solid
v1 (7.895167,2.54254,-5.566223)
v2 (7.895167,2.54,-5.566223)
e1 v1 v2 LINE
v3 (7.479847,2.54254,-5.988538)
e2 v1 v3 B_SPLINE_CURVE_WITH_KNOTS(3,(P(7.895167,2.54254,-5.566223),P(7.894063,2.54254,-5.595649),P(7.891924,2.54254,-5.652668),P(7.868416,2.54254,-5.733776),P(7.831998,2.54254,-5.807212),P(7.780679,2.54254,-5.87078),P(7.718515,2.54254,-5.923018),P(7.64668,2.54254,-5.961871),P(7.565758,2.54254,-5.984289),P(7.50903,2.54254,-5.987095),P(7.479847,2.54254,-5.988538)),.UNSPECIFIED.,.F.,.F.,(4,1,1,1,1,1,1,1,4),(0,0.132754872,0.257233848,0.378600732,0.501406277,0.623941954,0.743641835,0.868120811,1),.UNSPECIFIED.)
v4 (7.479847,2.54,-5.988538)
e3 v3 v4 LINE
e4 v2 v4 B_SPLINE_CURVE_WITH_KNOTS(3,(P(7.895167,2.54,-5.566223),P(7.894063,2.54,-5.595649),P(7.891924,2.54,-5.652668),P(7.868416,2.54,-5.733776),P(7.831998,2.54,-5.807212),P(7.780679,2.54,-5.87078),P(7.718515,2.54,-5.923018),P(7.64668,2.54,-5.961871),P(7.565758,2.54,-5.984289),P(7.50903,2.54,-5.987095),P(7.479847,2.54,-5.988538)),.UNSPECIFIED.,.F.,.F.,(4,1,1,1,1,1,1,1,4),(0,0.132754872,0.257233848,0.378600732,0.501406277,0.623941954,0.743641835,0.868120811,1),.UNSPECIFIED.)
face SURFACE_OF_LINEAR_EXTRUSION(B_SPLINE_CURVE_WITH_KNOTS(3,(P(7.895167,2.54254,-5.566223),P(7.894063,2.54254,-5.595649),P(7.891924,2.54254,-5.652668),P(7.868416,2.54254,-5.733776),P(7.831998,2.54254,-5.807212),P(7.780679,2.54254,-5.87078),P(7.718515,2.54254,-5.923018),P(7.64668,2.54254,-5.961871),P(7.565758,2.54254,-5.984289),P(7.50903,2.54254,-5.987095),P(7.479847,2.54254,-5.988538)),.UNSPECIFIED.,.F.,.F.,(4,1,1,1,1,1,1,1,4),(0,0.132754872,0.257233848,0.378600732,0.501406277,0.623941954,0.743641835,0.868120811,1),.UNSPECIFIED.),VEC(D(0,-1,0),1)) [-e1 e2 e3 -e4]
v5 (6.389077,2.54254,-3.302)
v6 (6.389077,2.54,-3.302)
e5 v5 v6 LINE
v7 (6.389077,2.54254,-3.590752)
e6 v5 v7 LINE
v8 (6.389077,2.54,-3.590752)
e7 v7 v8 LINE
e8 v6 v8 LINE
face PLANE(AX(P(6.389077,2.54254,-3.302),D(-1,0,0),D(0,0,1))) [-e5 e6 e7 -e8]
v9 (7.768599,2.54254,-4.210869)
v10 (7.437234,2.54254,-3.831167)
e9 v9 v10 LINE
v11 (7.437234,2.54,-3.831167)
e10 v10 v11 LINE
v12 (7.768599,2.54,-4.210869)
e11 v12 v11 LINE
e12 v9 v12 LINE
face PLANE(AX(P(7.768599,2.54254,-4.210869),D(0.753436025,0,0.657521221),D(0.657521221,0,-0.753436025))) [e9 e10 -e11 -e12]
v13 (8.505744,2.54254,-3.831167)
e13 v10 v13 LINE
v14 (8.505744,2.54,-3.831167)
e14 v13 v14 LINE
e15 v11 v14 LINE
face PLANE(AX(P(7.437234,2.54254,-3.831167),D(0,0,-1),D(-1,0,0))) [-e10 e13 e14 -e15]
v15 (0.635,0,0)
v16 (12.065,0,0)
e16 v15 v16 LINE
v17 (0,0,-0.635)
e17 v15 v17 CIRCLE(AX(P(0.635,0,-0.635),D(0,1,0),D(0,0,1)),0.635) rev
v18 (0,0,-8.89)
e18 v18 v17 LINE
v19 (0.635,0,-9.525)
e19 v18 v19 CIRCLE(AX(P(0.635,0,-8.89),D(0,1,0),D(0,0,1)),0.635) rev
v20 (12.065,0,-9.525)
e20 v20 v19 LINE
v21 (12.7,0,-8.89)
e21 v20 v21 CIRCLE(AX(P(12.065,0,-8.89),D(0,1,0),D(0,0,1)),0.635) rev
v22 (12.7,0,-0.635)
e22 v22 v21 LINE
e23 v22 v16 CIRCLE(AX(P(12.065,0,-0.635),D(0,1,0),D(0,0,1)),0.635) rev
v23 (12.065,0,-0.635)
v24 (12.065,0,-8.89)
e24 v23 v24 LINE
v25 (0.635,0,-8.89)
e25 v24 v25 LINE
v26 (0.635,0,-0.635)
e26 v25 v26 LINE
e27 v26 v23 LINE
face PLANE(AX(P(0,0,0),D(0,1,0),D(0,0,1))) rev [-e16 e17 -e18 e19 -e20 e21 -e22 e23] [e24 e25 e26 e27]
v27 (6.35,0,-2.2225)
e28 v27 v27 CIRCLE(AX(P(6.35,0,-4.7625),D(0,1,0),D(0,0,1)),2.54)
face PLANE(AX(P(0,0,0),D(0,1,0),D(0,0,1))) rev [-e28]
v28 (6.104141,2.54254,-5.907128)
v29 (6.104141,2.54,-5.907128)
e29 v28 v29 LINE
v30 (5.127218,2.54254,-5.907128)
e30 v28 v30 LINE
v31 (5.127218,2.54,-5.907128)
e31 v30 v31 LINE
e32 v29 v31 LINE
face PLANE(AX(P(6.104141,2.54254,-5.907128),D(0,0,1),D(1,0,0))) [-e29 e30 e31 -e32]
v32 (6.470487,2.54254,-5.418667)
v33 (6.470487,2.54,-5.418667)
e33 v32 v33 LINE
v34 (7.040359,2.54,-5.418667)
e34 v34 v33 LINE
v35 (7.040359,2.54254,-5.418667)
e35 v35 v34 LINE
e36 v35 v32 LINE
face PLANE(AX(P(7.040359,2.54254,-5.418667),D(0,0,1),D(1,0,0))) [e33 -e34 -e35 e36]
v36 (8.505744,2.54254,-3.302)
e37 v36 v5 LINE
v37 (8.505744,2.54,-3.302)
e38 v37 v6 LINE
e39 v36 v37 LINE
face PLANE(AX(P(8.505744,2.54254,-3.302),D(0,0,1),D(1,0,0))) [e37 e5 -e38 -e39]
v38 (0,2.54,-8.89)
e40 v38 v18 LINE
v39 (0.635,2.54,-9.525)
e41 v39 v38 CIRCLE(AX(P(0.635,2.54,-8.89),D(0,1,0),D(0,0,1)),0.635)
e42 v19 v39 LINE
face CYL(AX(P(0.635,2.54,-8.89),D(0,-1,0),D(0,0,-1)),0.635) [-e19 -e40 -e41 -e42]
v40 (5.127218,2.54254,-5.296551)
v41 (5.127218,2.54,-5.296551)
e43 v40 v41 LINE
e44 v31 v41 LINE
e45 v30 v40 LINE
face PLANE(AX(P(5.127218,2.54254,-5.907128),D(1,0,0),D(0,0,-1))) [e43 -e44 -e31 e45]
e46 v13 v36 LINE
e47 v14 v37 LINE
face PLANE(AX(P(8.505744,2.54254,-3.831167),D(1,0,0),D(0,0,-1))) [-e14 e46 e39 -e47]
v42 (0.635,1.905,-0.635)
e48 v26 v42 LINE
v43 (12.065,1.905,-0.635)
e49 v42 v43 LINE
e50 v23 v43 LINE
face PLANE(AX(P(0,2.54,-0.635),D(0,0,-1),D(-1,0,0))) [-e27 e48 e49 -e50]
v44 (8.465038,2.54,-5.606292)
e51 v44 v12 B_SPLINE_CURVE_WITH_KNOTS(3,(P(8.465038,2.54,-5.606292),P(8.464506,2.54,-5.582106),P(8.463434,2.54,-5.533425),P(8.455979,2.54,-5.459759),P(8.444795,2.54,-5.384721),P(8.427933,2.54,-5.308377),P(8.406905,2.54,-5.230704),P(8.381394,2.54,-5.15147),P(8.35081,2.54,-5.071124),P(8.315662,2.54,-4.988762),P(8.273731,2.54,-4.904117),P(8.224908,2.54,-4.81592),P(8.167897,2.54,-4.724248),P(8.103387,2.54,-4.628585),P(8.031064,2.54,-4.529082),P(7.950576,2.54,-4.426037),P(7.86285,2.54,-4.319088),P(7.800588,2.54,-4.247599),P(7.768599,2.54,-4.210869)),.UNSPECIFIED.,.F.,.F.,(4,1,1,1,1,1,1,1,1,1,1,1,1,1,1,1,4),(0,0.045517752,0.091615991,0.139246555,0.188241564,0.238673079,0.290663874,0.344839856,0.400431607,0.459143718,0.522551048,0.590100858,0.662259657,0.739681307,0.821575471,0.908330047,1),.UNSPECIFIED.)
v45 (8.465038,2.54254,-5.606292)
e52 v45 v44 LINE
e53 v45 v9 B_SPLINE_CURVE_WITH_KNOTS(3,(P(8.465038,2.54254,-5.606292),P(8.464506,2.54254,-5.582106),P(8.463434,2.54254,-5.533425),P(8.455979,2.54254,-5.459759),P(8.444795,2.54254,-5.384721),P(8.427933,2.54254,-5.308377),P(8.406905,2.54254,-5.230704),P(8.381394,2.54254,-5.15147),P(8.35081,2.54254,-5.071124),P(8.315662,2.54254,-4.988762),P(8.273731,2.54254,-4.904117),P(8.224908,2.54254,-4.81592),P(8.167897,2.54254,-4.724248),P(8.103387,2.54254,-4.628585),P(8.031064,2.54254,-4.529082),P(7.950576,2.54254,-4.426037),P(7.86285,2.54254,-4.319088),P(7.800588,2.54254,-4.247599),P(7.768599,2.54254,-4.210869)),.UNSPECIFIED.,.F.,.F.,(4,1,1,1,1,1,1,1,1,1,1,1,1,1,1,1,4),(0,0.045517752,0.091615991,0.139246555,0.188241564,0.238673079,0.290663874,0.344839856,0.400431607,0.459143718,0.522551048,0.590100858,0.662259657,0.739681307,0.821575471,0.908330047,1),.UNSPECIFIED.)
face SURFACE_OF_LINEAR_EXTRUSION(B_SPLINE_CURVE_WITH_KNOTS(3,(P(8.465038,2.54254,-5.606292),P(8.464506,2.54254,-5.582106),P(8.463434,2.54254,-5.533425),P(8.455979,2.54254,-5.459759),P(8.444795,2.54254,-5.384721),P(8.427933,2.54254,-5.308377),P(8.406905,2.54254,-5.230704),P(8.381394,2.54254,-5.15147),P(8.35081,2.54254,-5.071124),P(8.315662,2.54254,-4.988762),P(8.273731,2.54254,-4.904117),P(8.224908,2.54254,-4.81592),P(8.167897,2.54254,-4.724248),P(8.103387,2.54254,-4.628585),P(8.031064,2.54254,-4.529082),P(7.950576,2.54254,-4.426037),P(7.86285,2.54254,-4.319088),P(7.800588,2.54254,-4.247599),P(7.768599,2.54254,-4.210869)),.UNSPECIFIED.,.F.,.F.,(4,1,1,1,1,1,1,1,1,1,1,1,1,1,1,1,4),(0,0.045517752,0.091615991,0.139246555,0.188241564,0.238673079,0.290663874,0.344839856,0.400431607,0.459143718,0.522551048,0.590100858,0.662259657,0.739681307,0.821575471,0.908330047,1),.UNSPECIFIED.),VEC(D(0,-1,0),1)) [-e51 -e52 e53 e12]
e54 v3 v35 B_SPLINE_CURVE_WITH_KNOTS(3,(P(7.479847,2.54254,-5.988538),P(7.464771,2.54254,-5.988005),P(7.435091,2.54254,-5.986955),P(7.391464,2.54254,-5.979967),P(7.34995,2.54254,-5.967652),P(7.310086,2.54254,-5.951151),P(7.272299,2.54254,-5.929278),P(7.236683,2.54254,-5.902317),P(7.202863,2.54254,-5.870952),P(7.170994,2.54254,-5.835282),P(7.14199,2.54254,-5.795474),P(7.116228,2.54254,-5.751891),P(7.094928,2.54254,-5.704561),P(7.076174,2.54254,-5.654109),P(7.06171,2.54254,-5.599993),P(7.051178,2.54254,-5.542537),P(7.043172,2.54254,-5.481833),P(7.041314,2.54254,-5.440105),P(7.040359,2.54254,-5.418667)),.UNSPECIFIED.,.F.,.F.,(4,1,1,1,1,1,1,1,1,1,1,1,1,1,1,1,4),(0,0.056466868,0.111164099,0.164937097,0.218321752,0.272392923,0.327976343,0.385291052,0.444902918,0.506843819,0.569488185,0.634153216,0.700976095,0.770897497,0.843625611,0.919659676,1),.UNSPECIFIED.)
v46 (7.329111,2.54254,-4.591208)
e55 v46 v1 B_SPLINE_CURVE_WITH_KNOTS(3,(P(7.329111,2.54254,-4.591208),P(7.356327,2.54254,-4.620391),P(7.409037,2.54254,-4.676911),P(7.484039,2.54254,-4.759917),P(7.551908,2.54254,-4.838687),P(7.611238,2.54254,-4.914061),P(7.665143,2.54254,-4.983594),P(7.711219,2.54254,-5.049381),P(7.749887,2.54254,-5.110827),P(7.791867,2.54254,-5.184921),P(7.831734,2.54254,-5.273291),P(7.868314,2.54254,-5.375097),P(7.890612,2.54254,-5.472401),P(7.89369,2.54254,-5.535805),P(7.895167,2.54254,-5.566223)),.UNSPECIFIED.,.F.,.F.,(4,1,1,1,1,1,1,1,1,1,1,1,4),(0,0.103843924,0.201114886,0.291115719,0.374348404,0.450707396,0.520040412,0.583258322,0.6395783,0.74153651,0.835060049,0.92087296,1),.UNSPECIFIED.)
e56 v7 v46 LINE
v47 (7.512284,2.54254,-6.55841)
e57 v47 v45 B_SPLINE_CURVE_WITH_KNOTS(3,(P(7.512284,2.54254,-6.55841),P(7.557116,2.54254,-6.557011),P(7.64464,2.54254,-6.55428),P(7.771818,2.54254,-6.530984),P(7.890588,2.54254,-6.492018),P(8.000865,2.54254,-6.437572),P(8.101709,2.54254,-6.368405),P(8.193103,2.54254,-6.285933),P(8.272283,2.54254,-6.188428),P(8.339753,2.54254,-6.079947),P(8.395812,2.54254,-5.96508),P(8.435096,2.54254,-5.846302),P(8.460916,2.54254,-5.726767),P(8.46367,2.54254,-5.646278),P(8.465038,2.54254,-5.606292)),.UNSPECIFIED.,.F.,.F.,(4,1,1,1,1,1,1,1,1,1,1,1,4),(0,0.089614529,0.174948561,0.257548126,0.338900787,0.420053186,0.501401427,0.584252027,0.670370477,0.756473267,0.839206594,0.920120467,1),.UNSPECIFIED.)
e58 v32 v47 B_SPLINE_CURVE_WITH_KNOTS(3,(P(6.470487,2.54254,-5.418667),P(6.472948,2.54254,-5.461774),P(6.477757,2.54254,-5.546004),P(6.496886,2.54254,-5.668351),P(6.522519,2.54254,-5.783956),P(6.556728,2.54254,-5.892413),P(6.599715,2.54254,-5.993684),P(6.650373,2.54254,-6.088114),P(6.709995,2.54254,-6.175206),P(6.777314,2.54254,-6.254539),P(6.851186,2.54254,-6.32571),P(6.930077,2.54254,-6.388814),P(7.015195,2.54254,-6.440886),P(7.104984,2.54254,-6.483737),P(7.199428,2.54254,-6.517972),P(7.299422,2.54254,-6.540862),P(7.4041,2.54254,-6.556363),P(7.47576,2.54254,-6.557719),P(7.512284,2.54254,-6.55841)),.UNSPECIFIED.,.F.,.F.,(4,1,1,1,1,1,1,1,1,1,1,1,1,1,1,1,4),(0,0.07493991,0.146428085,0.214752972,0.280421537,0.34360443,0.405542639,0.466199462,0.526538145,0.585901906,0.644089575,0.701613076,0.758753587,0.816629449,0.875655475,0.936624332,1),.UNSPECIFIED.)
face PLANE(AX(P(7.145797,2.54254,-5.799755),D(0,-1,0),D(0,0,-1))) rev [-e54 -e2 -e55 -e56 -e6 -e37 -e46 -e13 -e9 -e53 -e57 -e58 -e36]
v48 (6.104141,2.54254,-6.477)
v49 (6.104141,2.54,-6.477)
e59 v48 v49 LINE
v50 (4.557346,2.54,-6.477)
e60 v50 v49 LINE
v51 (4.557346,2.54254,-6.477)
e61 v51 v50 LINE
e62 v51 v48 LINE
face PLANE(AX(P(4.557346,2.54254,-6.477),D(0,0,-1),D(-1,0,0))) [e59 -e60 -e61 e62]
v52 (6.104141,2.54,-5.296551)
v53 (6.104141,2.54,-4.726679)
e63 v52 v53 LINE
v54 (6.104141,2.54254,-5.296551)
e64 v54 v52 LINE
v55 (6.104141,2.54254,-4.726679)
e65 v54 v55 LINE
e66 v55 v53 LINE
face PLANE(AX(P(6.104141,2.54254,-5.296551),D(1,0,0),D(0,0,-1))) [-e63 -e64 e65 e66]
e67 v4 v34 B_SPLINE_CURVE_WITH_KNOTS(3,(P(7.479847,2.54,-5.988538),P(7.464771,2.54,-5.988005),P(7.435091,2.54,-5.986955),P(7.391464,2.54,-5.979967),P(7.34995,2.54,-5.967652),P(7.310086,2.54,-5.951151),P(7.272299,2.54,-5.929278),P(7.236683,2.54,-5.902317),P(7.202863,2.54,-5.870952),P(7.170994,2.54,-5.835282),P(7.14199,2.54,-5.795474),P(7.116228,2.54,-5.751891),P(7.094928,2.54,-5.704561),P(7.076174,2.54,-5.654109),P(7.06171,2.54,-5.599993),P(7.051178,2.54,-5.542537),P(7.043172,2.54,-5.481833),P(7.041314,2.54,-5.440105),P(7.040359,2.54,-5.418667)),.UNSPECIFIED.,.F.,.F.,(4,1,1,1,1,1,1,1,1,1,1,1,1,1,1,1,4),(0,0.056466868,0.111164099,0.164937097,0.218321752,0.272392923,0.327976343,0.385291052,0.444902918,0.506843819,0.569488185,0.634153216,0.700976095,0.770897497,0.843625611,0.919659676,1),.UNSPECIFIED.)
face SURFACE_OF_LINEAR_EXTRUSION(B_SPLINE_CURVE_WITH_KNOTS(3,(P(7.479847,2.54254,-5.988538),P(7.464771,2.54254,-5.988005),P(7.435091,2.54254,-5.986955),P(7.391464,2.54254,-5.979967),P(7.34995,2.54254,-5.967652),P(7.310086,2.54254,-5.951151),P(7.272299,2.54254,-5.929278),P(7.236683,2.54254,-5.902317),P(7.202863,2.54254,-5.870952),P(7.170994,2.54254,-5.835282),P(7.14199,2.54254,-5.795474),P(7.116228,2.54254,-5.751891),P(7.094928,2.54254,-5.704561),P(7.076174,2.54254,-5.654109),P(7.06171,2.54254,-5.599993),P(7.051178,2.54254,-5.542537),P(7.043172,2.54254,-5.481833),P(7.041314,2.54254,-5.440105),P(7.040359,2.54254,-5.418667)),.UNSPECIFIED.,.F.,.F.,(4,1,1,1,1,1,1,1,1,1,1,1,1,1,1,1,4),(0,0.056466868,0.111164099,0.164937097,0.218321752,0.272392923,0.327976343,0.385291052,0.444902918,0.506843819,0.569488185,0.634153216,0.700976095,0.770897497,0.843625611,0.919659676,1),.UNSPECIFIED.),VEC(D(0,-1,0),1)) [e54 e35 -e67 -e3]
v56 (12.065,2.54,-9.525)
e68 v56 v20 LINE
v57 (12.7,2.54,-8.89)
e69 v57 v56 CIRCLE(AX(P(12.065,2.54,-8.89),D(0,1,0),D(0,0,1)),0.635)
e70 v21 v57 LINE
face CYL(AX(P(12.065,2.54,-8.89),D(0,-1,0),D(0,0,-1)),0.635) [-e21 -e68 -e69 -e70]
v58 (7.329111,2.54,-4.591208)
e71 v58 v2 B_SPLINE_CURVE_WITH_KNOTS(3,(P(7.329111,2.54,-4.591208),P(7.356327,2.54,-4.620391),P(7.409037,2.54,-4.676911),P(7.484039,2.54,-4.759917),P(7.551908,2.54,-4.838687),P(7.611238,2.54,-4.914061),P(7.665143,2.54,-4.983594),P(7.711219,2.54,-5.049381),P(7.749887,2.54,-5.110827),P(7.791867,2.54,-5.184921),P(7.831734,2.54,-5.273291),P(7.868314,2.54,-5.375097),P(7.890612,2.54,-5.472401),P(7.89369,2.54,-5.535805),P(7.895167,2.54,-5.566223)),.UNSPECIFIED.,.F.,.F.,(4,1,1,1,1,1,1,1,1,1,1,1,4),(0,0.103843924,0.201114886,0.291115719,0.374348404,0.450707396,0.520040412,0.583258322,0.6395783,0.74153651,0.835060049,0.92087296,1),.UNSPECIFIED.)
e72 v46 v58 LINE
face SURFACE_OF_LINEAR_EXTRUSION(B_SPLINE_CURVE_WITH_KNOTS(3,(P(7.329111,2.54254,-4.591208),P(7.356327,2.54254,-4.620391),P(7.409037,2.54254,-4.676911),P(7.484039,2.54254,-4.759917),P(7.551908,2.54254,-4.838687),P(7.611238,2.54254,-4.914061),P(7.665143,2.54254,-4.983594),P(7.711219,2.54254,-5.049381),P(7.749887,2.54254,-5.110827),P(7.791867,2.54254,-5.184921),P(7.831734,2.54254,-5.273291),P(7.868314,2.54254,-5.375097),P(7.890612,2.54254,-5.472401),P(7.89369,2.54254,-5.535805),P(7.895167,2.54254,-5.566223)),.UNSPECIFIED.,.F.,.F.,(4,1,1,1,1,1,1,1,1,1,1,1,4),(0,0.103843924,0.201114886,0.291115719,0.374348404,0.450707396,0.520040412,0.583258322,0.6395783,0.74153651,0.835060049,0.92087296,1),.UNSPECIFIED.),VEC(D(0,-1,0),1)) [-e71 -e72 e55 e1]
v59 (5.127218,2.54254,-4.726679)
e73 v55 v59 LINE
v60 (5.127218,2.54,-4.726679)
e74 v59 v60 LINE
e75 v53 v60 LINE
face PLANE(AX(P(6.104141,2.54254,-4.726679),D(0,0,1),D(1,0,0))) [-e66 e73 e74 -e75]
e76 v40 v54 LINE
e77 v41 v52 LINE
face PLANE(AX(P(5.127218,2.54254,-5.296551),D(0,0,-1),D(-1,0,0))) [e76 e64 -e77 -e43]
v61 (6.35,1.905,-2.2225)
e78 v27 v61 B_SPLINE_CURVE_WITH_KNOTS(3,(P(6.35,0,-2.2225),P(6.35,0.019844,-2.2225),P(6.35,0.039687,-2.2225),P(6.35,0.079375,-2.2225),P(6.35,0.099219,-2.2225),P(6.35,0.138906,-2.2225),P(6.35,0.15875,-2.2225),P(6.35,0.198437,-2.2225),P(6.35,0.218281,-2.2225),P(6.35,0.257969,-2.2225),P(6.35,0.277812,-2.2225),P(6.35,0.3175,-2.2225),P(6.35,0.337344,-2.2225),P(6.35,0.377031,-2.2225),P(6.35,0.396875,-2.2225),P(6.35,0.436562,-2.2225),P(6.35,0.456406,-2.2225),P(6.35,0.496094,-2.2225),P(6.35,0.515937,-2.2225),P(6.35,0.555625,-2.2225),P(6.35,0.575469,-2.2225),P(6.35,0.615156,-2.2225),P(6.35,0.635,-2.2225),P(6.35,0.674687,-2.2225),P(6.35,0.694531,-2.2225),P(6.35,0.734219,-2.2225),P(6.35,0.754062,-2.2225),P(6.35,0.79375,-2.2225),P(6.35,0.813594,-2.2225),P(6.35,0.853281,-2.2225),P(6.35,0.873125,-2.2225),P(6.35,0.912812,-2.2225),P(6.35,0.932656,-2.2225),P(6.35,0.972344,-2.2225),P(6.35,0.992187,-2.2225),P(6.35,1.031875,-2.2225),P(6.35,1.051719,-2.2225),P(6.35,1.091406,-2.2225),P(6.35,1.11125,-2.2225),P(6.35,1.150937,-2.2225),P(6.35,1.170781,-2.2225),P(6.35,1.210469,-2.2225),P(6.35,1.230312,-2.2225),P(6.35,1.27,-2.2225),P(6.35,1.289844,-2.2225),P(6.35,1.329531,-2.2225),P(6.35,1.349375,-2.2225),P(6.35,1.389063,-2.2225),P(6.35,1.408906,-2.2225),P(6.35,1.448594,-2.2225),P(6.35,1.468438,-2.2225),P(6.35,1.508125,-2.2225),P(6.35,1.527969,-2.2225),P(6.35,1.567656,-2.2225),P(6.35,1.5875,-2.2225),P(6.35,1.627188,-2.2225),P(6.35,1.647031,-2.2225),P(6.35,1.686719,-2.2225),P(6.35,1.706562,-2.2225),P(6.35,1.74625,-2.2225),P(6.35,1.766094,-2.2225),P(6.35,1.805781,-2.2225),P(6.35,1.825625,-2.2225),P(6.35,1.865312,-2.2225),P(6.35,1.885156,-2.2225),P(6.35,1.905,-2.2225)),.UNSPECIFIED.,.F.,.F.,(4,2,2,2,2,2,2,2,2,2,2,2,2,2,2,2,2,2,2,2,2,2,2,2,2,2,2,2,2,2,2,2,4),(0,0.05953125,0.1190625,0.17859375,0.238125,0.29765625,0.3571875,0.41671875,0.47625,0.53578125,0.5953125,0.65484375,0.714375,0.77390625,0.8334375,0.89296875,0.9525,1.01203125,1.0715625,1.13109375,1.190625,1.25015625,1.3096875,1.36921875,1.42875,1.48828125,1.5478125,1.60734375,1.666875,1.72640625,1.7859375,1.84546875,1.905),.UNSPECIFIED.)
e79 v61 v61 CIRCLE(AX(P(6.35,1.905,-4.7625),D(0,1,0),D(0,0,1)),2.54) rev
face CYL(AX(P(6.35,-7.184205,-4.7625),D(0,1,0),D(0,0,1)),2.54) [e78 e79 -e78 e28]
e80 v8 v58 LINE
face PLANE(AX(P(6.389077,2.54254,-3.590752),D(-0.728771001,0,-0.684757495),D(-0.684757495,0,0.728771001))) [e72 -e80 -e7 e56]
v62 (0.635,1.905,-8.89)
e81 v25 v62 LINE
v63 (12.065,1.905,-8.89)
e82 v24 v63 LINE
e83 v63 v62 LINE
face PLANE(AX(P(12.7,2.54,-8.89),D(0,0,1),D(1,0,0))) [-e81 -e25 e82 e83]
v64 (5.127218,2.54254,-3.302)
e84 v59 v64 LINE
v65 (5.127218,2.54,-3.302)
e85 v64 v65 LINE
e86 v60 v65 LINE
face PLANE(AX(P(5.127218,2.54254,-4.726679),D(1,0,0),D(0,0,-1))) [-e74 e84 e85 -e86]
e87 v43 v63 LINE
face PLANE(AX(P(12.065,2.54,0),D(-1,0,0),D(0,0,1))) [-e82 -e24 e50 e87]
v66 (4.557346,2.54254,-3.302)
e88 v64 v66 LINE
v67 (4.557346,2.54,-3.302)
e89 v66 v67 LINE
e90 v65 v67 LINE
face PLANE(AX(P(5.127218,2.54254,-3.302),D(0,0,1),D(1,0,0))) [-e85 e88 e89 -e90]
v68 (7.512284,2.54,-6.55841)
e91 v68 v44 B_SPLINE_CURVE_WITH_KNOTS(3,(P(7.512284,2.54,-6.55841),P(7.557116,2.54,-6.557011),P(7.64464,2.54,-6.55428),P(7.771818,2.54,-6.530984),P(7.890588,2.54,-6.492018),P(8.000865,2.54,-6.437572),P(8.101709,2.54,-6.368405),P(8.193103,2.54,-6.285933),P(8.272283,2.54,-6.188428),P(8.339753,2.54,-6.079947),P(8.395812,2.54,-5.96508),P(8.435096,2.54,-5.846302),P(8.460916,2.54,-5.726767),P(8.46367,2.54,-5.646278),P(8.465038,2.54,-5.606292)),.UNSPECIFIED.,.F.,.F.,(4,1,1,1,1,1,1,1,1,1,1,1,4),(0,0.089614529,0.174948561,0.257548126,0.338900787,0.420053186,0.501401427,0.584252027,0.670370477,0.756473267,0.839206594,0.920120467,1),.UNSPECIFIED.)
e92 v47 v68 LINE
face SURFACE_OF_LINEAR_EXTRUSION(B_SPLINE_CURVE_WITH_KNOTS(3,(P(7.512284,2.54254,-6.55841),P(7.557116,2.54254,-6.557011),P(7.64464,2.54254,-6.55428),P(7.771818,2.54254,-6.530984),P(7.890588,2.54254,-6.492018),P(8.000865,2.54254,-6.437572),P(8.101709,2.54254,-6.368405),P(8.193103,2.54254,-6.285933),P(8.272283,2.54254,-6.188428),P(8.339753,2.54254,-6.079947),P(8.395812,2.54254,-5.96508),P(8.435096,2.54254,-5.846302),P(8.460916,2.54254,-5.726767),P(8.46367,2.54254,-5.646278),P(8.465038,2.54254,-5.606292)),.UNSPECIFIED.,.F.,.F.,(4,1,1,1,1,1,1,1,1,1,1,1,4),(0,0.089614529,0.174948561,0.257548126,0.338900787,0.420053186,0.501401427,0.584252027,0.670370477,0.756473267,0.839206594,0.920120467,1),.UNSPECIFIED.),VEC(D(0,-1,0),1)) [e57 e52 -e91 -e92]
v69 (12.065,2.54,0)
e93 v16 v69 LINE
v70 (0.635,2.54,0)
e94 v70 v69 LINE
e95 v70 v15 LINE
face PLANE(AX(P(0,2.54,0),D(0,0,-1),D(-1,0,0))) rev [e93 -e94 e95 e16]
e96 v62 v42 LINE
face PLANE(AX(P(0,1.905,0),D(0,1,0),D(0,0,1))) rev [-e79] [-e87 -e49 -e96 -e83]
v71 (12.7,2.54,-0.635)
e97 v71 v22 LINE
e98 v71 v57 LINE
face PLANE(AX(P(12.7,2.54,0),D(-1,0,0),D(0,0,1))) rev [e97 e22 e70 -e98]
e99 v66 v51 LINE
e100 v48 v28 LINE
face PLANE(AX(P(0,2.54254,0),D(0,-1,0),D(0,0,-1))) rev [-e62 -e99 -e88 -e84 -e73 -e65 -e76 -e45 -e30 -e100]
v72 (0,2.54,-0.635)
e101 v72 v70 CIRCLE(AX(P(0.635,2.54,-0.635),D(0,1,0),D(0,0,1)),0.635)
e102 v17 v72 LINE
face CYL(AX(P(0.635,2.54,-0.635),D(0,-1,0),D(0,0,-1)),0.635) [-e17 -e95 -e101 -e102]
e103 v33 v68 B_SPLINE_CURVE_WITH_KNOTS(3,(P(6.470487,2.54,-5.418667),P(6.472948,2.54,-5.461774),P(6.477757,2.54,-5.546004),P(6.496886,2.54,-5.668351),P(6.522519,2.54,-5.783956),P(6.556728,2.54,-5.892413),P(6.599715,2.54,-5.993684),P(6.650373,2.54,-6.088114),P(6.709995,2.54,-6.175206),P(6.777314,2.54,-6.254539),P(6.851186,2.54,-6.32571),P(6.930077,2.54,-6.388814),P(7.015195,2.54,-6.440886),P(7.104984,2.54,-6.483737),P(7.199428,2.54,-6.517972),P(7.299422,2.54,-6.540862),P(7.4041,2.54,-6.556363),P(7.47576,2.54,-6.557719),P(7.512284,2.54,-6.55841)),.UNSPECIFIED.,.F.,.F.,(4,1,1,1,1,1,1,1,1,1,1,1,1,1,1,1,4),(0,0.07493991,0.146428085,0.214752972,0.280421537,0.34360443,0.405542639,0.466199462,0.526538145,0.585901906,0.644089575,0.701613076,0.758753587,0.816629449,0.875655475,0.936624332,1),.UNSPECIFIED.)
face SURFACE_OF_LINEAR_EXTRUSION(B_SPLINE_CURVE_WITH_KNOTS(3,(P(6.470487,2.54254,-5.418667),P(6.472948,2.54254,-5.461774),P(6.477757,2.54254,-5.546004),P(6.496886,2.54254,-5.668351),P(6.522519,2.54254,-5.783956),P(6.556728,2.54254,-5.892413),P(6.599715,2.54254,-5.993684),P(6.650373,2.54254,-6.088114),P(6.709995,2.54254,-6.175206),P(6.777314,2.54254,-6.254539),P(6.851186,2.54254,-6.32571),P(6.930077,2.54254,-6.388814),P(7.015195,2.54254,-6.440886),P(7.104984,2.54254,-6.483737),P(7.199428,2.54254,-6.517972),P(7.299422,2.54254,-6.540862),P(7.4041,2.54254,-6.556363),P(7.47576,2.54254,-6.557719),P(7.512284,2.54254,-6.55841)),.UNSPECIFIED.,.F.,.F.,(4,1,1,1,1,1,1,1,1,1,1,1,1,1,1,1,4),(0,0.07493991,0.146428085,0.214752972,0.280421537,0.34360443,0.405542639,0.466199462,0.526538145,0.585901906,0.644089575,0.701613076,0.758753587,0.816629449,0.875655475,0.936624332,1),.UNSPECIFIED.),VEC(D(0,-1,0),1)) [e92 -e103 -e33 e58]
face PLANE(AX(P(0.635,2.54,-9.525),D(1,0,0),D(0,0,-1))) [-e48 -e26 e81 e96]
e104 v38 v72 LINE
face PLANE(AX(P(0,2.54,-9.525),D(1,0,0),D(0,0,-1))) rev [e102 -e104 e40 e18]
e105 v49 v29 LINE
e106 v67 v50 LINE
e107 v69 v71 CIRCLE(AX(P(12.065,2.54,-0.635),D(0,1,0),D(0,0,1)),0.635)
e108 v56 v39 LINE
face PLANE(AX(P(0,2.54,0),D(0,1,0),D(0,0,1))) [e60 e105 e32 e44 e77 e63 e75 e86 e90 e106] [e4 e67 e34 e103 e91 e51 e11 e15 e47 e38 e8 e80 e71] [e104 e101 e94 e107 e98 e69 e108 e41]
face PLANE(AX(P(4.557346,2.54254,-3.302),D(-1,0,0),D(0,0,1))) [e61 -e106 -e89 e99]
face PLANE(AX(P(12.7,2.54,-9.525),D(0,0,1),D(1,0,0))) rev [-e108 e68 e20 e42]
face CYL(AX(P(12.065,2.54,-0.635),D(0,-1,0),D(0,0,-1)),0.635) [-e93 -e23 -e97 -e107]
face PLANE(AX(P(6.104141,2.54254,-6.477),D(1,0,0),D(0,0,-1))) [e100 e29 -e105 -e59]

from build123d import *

# Parameters (mm, degrees)
SKETCH1_W           = 12.7
SKETCH1_H           = 9.525
BOSS_EXTRUDE1_DEPTH = 2.54
FILLET1_R           = 0.635
SHELL1_START        = 0.635
SHELL1_OUTLINE_W    = 1.905
SHELL1_OUTLINE_H    = 8.255
SHELL1_DEPTH        = 11.43
SKETCH2_R           = 2.54
BOSS_EXTRUDE2_DEPTH = 1.905
BOSS_EXTRUDE3_DEPTH = 0.00254


# Read off the part's stored shape, not the designer's step: Shell1
with BuildPart() as part:
    # Sketch1 → Boss-Extrude1 (new body)
    with BuildSketch(Plane(origin=(0, 0, 0), x_dir=(1, 0, 0), z_dir=(0, 1, 0))):
        with Locations((6.35, 4.7625)):
            Rectangle(SKETCH1_W, SKETCH1_H)
    extrude(amount=BOSS_EXTRUDE1_DEPTH)

    # Fillet1
    fillet1_edges = [part.edges().sort_by_distance(p)[0] for p in [
        (0, 1.27, -9.525),
        (12.7, 1.27, -9.525),
        (12.7, 1.27, 0),
        (0, 1.27, 0),
    ]]
    fillet(fillet1_edges, radius=FILLET1_R)

    # Shell1 outline → Shell1 (cut)
    with BuildSketch(Plane.YZ.offset(SHELL1_START)):
        with Locations((0.9525, -4.7625)):
            Rectangle(SHELL1_OUTLINE_W, SHELL1_OUTLINE_H)
    extrude(amount=SHELL1_DEPTH, mode=Mode.SUBTRACT)

    # Sketch2 → Boss-Extrude2 (add)
    with BuildSketch(Plane(origin=(0, 1.905, 0), x_dir=(-1, 0, 0), z_dir=(0, -1, 0))):
        with Locations(Location((-6.35, 4.7625, 0), (0, 0, 270))):
            Circle(SKETCH2_R)
    extrude(amount=BOSS_EXTRUDE2_DEPTH)

    # Sketch3 → Boss-Extrude3 (add)
    with BuildSketch(Plane(origin=(0, 2.54, 0), x_dir=(1, 0, 0), z_dir=(0, 1, 0))):
        Polygon((4.557346154, 6.477), (6.104141026, 6.477), (6.104141026, 5.907128205), (5.127217949, 5.907128205), (5.127217949, 5.296551282), (6.104141026, 5.296551282), (6.104141026, 4.726679487), (5.127217949, 4.726679487), (5.127217949, 3.302), (4.557346154, 3.302), align=None)
        with BuildLine():
            Line((7.040358974, 5.418666667), (6.470487179, 5.418666667))
            add(Edge.make_bspline(
                [(6.470487179, 5.418666667), (6.472948368, 5.461774453), (6.477757384, 5.54600448), (6.496886431, 5.66835129), (6.522518698, 5.783955572), (6.556728361, 5.89241293), (6.599715041, 5.993683952), (6.65037258, 6.088113879), (6.709995163, 6.175205533), (6.777313826, 6.254538911), (6.851185682, 6.325709616), (6.930077079, 6.388814034), (7.015194768, 6.440886212), (7.104983579, 6.483736794), (7.199428222, 6.517972417), (7.299422293, 6.540861702), (7.404099988, 6.55636255), (7.475760347, 6.557718936), (7.512284054, 6.558410256)],
                knots=[0, 0, 0, 0, 1.199038563, 2.342849363, 3.436047546, 4.486744587, 5.497670872, 6.488682221, 7.459191391, 8.424610317, 9.374430501, 10.305433194, 11.225809216, 12.140057399, 13.06607119, 14.010487599, 14.985989317, 16, 16, 16, 16], degree=3))
            add(Edge.make_bspline(
                [(7.512284054, 6.558410256), (7.557116388, 6.557011369), (7.644639608, 6.554280414), (7.77181779, 6.53098446), (7.890588306, 6.492018376), (8.000864822, 6.437572481), (8.101708535, 6.368404679), (8.193102721, 6.285933395), (8.272283476, 6.188428338), (8.339752827, 6.079946535), (8.395811794, 5.965079574), (8.435095583, 5.846302372), (8.460916395, 5.726766795), (8.463670345, 5.646277588), (8.465038462, 5.606291867)],
                knots=[0, 0, 0, 0, 1.075374347, 2.099382735, 3.09057751, 4.06680945, 5.040638231, 6.016817125, 7.011024321, 8.044445721, 9.0776792, 10.070479129, 11.0414456, 12, 12, 12, 12], degree=3))
            add(Edge.make_bspline(
                [(8.465038462, 5.606291867), (8.464505789, 5.582105677), (8.463433651, 5.53342485), (8.455978932, 5.459758812), (8.44479538, 5.384721339), (8.427933309, 5.308376769), (8.406904924, 5.230703702), (8.381394454, 5.151469689), (8.350810158, 5.071123958), (8.315662426, 4.98876223), (8.273731092, 4.904117111), (8.224907883, 4.815919737), (8.167896919, 4.724248345), (8.103386822, 4.62858533), (8.03106428, 4.529081566), (7.950576239, 4.426036789), (7.862849733, 4.319087904), (7.800587764, 4.247598577), (7.768599159, 4.210869191)],
                knots=[0, 0, 0, 0, 0.728284026, 1.46585585, 2.227944881, 3.01186502, 3.81876927, 4.650621989, 5.517437689, 6.406905708, 7.346299482, 8.360816762, 9.441613733, 10.596154504, 11.834900912, 13.145207542, 14.533280747, 16, 16, 16, 16], degree=3))
            Line((7.768599159, 4.210869191), (7.437233974, 3.831166667))
            Line((7.437233974, 3.831166667), (8.50574359, 3.831166667))
            Line((8.50574359, 3.831166667), (8.50574359, 3.302))
            Line((8.50574359, 3.302), (6.389076923, 3.302))
            Line((6.389076923, 3.302), (6.389076923, 3.590752003))
            Line((6.389076923, 3.590752003), (7.329110978, 4.591207732))
            add(Edge.make_bspline(
                [(7.329110978, 4.591207732), (7.356327379, 4.620391337), (7.409037478, 4.676911324), (7.484038516, 4.759916937), (7.551907831, 4.838687284), (7.611238096, 4.914061108), (7.665142888, 4.983593589), (7.711218596, 5.049380524), (7.749886777, 5.110827174), (7.791866571, 5.184921103), (7.831733577, 5.273291298), (7.868313967, 5.375097387), (7.890612246, 5.47240056), (7.893690114, 5.5358054), (7.895166667, 5.566222756)],
                knots=[0, 0, 0, 0, 1.246127091, 2.413378631, 3.493388633, 4.492180848, 5.408488754, 6.240484944, 6.999099869, 7.674939598, 8.898438119, 10.020720584, 11.050475521, 12, 12, 12, 12], degree=3))
            add(Edge.make_bspline(
                [(7.895166667, 5.566222756), (7.894062684, 5.595649202), (7.89192354, 5.652667658), (7.868416082, 5.733776109), (7.831997512, 5.807211531), (7.780678605, 5.870779591), (7.718515335, 5.923017682), (7.646679837, 5.961870906), (7.565757782, 5.984289038), (7.50902988, 5.987094988), (7.479847155, 5.988538462)],
                knots=[0, 0, 0, 0, 1.062038974, 2.057870785, 3.028805853, 4.01125022, 4.991535629, 5.949134679, 6.94496649, 8, 8, 8, 8], degree=3))
            add(Edge.make_bspline(
                [(7.479847155, 5.988538462), (7.464770988, 5.988005225), (7.435091132, 5.986955463), (7.391464063, 5.979967483), (7.349949772, 5.967651898), (7.310086183, 5.951150747), (7.27229873, 5.929278353), (7.236682725, 5.902317143), (7.202862908, 5.870952262), (7.170994391, 5.835281784), (7.14198988, 5.79547352), (7.116228179, 5.751891037), (7.094927542, 5.704561389), (7.076173686, 5.654109398), (7.061709815, 5.59999317), (7.051178323, 5.542536583), (7.043171933, 5.481833113), (7.041313685, 5.440105185), (7.040358974, 5.418666667)],
                knots=[0, 0, 0, 0, 0.903469896, 1.778625579, 2.63899355, 3.493148037, 4.358286772, 5.247621495, 6.164656832, 7.118446693, 8.109501108, 9.111810964, 10.146451449, 11.215617525, 12.33435995, 13.498009769, 14.714554818, 16, 16, 16, 16], degree=3))
        make_face()
    extrude(amount=BOSS_EXTRUDE3_DEPTH)


solid = part.part
